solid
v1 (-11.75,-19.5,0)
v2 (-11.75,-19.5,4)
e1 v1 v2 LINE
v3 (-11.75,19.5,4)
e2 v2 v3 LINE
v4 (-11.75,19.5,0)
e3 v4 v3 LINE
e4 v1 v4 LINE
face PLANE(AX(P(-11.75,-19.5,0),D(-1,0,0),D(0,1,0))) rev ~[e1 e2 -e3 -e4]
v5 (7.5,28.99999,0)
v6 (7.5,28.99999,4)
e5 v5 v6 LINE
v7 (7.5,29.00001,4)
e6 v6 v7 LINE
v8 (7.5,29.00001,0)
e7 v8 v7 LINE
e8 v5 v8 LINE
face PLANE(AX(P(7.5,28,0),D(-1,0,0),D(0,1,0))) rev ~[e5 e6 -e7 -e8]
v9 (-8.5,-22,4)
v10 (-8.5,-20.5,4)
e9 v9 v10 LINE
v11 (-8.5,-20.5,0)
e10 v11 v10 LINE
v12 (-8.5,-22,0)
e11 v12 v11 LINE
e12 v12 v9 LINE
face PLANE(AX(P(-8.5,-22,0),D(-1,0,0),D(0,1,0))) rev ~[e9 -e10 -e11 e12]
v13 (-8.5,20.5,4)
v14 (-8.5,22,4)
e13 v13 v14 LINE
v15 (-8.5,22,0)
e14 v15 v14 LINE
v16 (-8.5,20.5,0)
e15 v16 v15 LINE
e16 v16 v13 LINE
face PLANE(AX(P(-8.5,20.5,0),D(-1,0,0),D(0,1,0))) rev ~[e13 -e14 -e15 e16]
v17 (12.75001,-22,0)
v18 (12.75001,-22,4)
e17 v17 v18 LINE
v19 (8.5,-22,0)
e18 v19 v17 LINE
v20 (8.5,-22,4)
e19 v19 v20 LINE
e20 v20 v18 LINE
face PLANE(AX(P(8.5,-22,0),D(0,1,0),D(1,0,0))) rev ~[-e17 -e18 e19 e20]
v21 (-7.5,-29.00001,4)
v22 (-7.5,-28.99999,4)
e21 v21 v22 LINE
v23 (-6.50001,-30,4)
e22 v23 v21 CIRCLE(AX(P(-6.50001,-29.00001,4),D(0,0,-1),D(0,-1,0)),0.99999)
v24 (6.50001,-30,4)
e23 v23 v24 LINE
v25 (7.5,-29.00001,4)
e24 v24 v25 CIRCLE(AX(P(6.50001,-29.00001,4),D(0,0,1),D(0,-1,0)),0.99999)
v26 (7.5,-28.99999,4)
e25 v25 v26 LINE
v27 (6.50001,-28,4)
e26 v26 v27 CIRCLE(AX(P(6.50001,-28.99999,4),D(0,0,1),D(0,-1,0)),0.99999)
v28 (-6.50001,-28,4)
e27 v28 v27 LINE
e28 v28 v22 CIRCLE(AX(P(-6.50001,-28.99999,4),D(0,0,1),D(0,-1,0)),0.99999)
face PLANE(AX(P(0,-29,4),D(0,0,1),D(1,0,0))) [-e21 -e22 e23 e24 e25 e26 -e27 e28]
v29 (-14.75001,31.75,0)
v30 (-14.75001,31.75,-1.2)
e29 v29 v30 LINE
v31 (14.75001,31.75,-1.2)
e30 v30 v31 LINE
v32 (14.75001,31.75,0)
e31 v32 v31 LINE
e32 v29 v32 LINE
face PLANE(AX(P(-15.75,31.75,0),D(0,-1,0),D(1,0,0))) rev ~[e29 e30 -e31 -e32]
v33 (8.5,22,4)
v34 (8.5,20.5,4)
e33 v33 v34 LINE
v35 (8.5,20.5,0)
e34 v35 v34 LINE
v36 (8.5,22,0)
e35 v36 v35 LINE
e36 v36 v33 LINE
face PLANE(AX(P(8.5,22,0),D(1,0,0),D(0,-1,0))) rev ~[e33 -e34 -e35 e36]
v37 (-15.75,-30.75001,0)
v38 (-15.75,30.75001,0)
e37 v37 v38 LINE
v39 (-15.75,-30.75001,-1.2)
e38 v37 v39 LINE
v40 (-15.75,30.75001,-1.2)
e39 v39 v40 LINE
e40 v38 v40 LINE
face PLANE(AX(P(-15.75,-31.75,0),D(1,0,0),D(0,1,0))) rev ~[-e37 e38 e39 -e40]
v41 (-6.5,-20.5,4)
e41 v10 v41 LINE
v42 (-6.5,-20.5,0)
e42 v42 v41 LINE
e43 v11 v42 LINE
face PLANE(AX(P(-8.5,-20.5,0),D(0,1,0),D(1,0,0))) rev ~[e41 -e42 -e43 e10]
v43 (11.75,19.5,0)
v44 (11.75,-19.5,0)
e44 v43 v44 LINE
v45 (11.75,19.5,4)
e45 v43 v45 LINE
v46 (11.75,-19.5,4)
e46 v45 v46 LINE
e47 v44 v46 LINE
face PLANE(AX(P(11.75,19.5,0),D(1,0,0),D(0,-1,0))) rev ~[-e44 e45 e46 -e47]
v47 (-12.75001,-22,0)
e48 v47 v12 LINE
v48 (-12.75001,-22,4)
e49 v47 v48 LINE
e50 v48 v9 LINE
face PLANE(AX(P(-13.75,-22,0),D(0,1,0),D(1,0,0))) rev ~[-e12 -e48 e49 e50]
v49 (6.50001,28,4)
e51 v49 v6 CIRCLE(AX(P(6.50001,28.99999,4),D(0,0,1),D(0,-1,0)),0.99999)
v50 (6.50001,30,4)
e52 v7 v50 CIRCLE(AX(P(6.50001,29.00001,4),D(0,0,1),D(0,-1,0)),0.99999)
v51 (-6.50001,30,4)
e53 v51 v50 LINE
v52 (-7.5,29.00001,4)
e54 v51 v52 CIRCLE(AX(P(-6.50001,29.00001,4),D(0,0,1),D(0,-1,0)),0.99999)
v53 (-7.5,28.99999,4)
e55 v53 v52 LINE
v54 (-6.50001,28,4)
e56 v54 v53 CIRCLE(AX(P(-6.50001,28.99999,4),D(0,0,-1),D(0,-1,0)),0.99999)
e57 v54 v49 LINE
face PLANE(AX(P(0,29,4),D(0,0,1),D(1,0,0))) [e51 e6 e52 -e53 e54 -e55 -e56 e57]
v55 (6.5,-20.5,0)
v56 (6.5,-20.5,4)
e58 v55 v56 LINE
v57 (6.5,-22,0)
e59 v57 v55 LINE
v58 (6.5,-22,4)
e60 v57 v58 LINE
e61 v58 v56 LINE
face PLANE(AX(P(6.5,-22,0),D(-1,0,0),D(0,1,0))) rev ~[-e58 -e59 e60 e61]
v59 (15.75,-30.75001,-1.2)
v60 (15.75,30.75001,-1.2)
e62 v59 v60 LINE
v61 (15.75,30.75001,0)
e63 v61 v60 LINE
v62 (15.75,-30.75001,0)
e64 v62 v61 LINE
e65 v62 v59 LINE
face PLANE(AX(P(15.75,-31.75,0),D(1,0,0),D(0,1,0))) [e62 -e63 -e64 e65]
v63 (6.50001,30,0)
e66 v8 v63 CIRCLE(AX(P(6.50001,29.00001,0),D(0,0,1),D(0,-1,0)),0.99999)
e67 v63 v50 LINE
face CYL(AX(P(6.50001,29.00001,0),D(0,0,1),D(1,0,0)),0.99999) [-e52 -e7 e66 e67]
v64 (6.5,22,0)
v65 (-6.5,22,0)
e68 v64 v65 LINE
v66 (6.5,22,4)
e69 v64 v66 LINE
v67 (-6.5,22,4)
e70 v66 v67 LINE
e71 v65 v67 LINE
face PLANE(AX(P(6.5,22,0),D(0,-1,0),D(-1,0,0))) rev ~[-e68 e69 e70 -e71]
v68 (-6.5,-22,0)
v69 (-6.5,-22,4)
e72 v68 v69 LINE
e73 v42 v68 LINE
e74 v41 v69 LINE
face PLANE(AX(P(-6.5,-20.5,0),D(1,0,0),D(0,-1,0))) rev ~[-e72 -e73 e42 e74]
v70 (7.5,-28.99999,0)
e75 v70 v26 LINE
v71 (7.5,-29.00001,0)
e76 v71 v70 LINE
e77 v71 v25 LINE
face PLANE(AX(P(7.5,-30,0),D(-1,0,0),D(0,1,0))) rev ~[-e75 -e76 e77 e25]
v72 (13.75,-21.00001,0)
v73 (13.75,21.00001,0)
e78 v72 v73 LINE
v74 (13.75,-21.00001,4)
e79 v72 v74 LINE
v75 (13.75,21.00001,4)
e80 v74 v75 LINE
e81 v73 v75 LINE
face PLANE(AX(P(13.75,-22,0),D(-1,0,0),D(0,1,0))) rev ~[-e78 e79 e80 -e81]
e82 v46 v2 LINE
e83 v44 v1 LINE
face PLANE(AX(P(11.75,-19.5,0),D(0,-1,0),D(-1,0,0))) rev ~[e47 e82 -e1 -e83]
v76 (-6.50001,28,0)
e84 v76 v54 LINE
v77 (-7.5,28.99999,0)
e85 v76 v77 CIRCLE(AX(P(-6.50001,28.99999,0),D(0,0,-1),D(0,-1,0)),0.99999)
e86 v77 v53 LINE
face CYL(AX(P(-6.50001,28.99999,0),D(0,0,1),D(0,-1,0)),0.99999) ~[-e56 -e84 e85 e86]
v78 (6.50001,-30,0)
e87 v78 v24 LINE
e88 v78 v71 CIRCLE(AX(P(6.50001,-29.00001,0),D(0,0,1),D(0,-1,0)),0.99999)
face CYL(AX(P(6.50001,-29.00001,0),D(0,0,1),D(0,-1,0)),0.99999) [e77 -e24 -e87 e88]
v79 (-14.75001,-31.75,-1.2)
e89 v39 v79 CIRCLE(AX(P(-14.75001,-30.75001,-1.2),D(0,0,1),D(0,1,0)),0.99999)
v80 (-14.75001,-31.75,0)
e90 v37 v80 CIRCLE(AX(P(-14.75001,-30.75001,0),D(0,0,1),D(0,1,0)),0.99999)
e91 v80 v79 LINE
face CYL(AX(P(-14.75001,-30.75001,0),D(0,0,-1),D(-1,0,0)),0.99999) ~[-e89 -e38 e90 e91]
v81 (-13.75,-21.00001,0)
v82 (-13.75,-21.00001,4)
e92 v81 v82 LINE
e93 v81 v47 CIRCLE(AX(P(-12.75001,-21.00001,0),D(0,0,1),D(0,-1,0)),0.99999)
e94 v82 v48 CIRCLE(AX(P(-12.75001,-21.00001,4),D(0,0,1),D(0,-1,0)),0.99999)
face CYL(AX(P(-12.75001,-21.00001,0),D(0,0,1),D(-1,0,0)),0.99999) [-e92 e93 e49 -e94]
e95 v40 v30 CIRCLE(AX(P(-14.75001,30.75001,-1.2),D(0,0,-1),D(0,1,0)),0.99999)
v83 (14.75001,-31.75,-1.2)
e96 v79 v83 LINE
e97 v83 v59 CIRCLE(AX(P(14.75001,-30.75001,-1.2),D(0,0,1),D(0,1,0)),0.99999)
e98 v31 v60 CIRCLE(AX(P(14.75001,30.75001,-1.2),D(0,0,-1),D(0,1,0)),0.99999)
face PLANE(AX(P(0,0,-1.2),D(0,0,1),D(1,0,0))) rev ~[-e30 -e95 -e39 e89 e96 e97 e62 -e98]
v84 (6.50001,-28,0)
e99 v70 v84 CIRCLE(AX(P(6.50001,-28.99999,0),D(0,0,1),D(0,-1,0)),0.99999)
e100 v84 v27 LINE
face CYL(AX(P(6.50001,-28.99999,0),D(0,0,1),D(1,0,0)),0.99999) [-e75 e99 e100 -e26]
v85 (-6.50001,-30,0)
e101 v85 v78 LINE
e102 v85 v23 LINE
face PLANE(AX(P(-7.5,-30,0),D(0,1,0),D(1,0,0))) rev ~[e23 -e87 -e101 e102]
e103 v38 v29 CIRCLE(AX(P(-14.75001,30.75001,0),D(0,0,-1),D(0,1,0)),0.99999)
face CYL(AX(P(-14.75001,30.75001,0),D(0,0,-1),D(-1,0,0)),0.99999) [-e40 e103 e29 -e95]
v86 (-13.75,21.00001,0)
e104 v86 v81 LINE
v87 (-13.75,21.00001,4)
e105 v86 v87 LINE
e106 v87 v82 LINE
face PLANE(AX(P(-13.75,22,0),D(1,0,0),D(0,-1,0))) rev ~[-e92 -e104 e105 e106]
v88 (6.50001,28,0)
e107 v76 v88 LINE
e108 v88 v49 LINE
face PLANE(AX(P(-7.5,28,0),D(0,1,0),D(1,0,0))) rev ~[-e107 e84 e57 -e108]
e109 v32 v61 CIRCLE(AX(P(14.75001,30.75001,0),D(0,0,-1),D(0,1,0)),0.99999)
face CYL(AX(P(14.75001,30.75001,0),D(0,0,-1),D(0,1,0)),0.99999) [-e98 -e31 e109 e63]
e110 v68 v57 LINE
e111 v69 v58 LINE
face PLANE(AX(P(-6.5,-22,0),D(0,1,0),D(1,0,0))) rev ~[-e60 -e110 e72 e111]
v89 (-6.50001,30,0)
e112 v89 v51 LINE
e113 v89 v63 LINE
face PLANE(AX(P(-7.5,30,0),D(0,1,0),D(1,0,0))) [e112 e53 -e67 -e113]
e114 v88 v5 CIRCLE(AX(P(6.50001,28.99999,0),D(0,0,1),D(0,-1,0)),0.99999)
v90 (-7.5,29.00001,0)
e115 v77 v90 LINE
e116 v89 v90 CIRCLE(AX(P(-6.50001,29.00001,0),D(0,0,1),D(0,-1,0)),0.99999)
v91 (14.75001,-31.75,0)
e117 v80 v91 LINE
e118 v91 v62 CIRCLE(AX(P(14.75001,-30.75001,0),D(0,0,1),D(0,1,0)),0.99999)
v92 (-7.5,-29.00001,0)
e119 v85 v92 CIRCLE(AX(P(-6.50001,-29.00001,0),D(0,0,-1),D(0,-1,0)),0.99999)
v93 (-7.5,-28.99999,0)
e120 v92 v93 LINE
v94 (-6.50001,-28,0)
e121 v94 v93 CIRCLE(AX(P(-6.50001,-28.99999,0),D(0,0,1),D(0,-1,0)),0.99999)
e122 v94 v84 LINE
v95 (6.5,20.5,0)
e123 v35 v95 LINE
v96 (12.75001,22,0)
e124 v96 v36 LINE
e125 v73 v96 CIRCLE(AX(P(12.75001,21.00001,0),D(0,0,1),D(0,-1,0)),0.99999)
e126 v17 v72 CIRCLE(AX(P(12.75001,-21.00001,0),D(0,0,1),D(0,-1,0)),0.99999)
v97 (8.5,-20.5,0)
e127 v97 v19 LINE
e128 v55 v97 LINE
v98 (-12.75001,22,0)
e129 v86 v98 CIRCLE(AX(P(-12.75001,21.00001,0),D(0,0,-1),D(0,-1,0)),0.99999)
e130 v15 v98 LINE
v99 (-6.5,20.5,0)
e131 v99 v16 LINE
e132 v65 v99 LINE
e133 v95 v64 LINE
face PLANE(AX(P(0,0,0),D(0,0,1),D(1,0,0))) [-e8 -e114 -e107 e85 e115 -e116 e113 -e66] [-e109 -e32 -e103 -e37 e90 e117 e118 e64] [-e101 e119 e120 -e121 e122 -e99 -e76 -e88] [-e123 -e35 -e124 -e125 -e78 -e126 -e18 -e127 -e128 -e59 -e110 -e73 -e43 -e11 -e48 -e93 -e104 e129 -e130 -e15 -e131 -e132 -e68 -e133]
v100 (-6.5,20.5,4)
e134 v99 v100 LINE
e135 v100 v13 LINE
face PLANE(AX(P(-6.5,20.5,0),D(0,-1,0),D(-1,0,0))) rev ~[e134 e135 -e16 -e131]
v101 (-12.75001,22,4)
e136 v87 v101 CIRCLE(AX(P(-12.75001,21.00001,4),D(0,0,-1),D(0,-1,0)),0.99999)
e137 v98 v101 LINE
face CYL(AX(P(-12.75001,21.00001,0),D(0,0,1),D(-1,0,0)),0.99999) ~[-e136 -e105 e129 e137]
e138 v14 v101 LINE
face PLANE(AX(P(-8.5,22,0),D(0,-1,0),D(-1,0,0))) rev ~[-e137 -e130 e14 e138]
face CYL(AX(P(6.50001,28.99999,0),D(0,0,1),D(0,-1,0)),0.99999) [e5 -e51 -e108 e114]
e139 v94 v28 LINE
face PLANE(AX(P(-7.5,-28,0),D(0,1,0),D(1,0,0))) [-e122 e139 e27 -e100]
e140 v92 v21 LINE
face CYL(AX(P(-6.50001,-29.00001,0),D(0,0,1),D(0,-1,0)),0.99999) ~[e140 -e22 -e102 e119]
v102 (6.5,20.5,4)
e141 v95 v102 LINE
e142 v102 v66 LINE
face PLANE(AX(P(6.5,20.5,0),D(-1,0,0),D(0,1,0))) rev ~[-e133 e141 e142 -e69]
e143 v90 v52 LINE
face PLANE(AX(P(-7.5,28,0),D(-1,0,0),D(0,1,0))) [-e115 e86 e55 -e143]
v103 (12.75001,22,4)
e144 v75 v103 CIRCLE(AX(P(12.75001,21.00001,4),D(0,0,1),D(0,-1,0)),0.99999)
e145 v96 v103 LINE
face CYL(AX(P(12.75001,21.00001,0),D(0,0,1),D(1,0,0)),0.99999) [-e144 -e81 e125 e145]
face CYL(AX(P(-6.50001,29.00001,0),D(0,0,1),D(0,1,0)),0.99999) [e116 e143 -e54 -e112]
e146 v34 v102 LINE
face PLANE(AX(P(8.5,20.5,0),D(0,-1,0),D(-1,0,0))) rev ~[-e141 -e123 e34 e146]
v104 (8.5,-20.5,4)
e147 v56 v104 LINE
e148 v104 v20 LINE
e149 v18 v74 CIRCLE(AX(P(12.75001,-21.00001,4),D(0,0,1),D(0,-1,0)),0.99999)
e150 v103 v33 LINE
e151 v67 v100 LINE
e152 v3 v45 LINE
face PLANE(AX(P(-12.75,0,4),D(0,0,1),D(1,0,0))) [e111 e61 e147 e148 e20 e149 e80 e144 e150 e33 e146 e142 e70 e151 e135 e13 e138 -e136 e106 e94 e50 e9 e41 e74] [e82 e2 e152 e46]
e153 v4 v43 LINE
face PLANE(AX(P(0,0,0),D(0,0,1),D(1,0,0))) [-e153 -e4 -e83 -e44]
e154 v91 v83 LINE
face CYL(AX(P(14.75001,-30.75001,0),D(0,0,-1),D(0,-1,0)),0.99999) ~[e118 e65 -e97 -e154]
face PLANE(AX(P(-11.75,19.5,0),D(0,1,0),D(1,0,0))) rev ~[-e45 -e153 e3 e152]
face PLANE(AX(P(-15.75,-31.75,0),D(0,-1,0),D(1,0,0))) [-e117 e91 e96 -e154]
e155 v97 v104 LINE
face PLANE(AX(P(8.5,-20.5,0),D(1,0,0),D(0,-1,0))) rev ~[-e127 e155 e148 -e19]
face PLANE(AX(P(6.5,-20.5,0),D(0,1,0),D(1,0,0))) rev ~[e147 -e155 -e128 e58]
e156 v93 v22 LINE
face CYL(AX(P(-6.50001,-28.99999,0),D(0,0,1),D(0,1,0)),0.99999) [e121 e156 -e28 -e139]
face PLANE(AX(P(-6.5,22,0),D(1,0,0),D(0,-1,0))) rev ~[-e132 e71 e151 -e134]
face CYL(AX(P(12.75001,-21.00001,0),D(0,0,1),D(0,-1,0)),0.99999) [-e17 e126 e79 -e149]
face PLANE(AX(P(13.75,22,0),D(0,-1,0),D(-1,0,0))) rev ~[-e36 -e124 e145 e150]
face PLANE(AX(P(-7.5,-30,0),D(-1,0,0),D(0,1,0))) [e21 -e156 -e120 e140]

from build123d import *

# Parameters (mm, degrees)
F0_W     = 31.5
F0_H     = 63.5
F0_W_2   = 23.5
F0_H_2   = 39
F0_W_3   = 15
F0_H_3   = 2
F0_W_4   = 2
F0_H_4   = 1.5
F1_DEPTH = 1.2
F2_DEPTH = 4
F3_R     = 0.99999


# Not quite as in the source:
# - a fillet or chamfer is up to 0.001 mm smaller than in the source, because OpenCascade refuses the exact size


with BuildPart() as f1:
    # F0 (on Top) → F1 (new body)
    with BuildSketch(Plane.XY):
        Rectangle(F0_W, F0_H)
        Polygon((13.75, -22), (13.75, -30), (7.5, -30), (-7.5, -30), (-13.75, -30), (-13.75, -22), (-13.75, 22), (-13.75, 30), (-7.5, 30), (7.5, 30), (13.75, 30), (13.75, 22), align=None, mode=Mode.SUBTRACT)
        Rectangle(F0_W_2, F0_H_2)
        Polygon((-7.5, -28), (7.5, -28), (11.75, -28), (11.75, -22), (8.5, -22), (6.5, -22), (-6.5, -22), (-8.5, -22), (-11.75, -22), (-11.75, -28), align=None)
        Polygon((8.5, 22), (11.75, 22), (11.75, 28), (7.5, 28), (-7.5, 28), (-11.75, 28), (-11.75, 22), (-8.5, 22), (-6.5, 22), (6.5, 22), align=None)
        Polygon((-13.75, 22), (-13.75, -22), (-11.75, -22), (-11.75, -19.5), (-11.75, 19.5), (-11.75, 22), align=None)
        Polygon((11.75, -22), (13.75, -22), (13.75, 22), (11.75, 22), (11.75, 19.5), (11.75, -19.5), align=None)
        Polygon((8.5, -22), (11.75, -22), (11.75, -19.5), (-11.75, -19.5), (-11.75, -22), (-8.5, -22), (-8.5, -20.5), (-6.5, -20.5), (-6.5, -22), (6.5, -22), (6.5, -20.5), (8.5, -20.5), align=None)
        Polygon((11.75, 19.5), (11.75, 22), (8.5, 22), (8.5, 20.5), (6.5, 20.5), (6.5, 22), (-6.5, 22), (-6.5, 20.5), (-8.5, 20.5), (-8.5, 22), (-11.75, 22), (-11.75, 19.5), align=None)
        with Locations((0, -29)):
            Rectangle(F0_W_3, F0_H_3)
        with Locations((0, 29)):
            Rectangle(F0_W_3, F0_H_3)
        Polygon((7.5, -30), (13.75, -30), (13.75, -22), (11.75, -22), (11.75, -28), (7.5, -28), align=None)
        Polygon((-13.75, -30), (-7.5, -30), (-7.5, -28), (-11.75, -28), (-11.75, -22), (-13.75, -22), align=None)
        Polygon((11.75, 22), (13.75, 22), (13.75, 30), (7.5, 30), (7.5, 28), (11.75, 28), align=None)
        Polygon((-13.75, 30), (-13.75, 22), (-11.75, 22), (-11.75, 28), (-7.5, 28), (-7.5, 30), align=None)
        with Locations((-7.5, 21.25)):
            Rectangle(F0_W_4, F0_H_4)
        with Locations((7.5, 21.25)):
            Rectangle(F0_W_4, F0_H_4)
        with Locations((-7.5, -21.25)):
            Rectangle(F0_W_4, F0_H_4)
        with Locations((7.5, -21.25)):
            Rectangle(F0_W_4, F0_H_4)
    extrude(amount=-F1_DEPTH)

    # F0 (on Top) → F2 (join)
    with BuildSketch(Plane.XY):
        Polygon((-13.75, 22), (-13.75, -22), (-11.75, -22), (-11.75, -19.5), (-11.75, 19.5), (-11.75, 22), align=None)
        Polygon((11.75, 19.5), (11.75, 22), (8.5, 22), (8.5, 20.5), (6.5, 20.5), (6.5, 22), (-6.5, 22), (-6.5, 20.5), (-8.5, 20.5), (-8.5, 22), (-11.75, 22), (-11.75, 19.5), align=None)
        Polygon((11.75, -22), (13.75, -22), (13.75, 22), (11.75, 22), (11.75, 19.5), (11.75, -19.5), align=None)
        Polygon((8.5, -22), (11.75, -22), (11.75, -19.5), (-11.75, -19.5), (-11.75, -22), (-8.5, -22), (-8.5, -20.5), (-6.5, -20.5), (-6.5, -22), (6.5, -22), (6.5, -20.5), (8.5, -20.5), align=None)
        with Locations((0, 29)):
            Rectangle(F0_W_3, F0_H_3)
        with Locations((0, -29)):
            Rectangle(F0_W_3, F0_H_3)
    extrude(amount=F2_DEPTH)

    # F3 (radius 1 in the source; OpenCascade refuses exactly that, so slightly less here)
    f3_edges = [f1.edges().sort_by_distance(p)[0] for p in [
        (-13.75, 22, 2),
        (13.75, 22, 2),
        (13.75, -22, 2),
        (-13.75, -22, 2),
        (-15.75, -31.75, -0.6),
        (15.75, -31.75, -0.6),
        (-15.75, 31.75, -0.6),
        (15.75, 31.75, -0.6),
        (-7.5, -30, 2),
        (7.5, -30, 2),
        (7.5, -28, 2),
        (-7.5, -28, 2),
        (-7.5, 28, 2),
        (7.5, 28, 2),
        (7.5, 30, 2),
        (-7.5, 30, 2),
    ]]
    fillet(f3_edges, radius=F3_R)


solid = f1.part
